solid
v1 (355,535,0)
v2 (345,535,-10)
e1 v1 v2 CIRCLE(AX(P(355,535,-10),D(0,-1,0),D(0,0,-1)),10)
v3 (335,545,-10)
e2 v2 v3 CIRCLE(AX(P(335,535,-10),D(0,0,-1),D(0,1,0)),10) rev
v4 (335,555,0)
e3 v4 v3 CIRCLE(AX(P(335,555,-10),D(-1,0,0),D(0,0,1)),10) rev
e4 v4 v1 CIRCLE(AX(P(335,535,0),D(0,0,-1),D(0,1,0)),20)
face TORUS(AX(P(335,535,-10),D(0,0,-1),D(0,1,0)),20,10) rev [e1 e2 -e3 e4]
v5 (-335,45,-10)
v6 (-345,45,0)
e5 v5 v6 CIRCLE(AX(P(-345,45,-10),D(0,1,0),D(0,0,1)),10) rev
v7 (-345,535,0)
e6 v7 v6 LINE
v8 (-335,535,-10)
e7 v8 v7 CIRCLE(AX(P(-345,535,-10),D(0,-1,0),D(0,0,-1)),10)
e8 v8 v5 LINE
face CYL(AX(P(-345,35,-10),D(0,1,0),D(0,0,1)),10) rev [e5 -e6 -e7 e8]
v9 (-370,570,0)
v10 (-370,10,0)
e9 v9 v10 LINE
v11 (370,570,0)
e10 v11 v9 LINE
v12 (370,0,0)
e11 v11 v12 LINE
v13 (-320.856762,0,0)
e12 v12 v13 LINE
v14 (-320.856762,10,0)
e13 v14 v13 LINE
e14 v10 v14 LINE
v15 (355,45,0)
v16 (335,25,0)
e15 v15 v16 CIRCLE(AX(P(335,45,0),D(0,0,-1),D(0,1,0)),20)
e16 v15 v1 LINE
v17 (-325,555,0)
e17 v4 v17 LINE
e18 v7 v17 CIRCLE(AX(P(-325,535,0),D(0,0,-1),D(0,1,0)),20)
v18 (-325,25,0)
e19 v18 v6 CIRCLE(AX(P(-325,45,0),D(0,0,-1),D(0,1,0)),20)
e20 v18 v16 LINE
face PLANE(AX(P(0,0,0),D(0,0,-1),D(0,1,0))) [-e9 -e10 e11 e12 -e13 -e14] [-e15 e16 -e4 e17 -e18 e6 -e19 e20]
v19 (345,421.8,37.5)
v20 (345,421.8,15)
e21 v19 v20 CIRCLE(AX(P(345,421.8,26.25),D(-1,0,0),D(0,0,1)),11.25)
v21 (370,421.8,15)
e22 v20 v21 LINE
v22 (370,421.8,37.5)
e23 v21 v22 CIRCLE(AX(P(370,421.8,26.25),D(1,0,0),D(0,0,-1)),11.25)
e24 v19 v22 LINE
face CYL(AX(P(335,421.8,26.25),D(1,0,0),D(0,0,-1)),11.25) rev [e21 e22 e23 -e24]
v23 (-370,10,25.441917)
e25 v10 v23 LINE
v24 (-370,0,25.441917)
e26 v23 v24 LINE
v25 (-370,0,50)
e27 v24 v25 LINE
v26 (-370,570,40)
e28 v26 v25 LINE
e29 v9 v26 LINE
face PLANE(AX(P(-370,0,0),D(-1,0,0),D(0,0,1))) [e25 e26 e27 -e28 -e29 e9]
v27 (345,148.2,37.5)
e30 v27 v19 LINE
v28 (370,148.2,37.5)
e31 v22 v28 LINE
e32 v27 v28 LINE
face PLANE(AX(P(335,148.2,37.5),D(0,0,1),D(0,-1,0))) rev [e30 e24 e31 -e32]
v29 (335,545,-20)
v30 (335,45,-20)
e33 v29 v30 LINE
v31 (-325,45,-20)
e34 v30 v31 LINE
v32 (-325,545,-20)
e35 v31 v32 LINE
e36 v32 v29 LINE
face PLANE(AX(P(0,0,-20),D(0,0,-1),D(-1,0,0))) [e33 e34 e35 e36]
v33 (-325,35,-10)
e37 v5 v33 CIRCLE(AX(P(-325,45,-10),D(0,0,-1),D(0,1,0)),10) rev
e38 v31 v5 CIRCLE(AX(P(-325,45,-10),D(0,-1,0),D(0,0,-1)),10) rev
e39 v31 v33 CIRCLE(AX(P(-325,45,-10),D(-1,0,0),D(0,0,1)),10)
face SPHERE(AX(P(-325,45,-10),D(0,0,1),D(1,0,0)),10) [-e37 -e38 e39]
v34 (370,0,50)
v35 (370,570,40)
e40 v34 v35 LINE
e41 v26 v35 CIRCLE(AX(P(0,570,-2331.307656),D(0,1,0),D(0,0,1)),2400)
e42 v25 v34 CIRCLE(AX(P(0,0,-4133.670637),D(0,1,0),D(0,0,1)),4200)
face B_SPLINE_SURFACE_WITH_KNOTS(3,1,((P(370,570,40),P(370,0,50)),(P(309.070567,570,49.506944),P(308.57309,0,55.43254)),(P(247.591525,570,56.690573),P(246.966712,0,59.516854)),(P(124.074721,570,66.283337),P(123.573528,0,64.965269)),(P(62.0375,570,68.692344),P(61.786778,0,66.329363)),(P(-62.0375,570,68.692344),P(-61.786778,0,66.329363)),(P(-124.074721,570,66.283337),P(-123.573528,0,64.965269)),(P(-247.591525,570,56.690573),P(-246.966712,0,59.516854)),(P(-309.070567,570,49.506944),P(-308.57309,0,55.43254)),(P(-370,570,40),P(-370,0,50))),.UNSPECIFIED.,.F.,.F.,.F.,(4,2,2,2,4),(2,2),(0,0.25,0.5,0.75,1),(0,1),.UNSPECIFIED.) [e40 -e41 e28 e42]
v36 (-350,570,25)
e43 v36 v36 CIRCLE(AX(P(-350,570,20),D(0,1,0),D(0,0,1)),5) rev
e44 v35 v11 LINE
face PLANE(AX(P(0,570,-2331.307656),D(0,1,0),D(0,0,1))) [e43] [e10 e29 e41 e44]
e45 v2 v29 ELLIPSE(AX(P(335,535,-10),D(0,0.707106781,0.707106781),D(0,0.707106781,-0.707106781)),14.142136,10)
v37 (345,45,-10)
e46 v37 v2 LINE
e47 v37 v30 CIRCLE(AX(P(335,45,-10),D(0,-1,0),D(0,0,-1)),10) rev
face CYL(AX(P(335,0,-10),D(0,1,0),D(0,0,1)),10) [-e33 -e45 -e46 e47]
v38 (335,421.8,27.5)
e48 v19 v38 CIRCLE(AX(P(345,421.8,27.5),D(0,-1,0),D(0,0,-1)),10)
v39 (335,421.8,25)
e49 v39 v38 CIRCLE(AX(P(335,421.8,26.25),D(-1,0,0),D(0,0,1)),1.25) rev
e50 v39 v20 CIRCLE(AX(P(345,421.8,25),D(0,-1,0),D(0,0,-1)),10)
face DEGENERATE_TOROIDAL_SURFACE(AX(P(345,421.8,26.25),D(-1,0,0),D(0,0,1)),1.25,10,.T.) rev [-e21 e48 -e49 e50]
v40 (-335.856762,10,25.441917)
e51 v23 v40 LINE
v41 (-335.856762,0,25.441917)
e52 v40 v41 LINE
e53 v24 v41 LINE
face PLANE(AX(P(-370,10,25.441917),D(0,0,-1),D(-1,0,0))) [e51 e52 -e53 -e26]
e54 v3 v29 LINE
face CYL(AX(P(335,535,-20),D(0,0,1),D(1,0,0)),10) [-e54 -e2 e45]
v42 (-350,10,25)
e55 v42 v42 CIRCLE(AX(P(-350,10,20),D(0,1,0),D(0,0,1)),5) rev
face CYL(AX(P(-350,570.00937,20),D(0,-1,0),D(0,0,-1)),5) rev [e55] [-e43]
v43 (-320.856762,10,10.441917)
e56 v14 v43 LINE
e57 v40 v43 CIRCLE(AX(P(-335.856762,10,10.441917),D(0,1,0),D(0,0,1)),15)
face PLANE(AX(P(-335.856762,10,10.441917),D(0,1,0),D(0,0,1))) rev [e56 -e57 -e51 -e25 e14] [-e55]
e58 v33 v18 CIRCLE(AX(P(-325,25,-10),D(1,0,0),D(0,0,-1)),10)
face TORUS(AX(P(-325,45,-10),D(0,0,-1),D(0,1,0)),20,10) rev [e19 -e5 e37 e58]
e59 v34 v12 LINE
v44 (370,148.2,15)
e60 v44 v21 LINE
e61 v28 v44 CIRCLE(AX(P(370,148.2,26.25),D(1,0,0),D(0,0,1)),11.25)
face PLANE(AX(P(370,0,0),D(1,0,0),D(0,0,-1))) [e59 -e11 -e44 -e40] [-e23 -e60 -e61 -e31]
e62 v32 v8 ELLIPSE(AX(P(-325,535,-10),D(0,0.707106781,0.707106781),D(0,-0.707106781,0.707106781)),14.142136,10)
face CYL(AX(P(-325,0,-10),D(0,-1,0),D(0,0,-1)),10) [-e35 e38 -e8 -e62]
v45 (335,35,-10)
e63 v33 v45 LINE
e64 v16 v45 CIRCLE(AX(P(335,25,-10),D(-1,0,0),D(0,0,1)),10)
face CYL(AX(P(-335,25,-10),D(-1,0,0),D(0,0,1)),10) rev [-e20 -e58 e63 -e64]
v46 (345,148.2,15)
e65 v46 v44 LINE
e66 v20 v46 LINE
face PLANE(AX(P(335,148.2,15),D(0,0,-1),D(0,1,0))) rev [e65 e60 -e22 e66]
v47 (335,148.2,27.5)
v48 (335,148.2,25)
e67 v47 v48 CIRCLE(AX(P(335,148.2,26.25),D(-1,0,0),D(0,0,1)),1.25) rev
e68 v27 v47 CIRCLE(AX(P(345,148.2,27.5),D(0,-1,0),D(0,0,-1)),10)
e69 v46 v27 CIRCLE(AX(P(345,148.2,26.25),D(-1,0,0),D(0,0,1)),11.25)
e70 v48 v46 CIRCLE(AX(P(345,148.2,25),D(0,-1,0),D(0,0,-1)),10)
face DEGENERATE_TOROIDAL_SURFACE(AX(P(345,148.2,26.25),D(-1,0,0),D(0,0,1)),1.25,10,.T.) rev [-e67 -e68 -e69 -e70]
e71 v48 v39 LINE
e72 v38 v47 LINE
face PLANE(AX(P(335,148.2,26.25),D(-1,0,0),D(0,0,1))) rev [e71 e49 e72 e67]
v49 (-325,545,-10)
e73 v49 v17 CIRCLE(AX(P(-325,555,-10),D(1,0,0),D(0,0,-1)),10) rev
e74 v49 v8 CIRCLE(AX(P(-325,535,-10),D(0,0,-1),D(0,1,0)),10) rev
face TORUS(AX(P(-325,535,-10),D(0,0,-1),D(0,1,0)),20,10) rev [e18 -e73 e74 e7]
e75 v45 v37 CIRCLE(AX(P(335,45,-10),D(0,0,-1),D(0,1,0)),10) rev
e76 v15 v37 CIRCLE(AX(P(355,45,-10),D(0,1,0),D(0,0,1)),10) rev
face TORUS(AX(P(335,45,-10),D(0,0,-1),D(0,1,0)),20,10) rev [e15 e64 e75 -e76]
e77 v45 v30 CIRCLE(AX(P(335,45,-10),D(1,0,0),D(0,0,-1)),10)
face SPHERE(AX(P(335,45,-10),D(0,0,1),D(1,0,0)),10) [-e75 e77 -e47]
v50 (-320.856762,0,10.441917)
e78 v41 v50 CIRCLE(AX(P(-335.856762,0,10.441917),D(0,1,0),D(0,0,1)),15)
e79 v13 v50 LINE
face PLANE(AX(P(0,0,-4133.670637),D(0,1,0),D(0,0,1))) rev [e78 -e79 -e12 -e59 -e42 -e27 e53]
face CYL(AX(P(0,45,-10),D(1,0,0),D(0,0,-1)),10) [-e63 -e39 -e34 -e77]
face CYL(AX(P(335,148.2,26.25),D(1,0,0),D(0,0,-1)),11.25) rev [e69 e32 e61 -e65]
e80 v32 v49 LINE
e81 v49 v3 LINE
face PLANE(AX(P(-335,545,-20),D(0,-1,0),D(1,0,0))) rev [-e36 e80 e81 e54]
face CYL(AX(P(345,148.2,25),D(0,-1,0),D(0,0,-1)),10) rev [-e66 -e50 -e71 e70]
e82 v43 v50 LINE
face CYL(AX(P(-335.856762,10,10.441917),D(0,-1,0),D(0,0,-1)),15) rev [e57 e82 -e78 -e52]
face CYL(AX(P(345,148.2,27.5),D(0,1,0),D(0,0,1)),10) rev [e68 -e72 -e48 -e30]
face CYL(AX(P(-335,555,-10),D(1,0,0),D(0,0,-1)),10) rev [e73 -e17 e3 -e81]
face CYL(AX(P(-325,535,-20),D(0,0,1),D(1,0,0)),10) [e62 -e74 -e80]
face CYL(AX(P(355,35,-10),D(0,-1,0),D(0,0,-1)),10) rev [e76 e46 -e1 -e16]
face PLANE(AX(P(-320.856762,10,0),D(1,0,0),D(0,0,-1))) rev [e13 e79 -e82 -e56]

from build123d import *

# Parameters (mm, degrees)
CORTE_EXTRUS_O3_REACH    = 685.022
ESBO_O5_R                = 5
CORTE_EXTRUS_O4_DEPTH    = 10
ESBO_O8_W                = 680
ESBO_O8_H                = 510
RESSALTO_EXTRUS_O1_DEPTH = 20
FILETE1_R                = 10
CORTE_EXTRUS_O5_DEPTH    = 35
FILETE17_R               = 10


with BuildPart() as part:
    # Esboço2 for Loft1 → Loft1 section 0
    with BuildSketch(Plane(origin=(0, 570, 0), x_dir=(1, 0, 0), z_dir=(0, 1, 0))):
        with BuildLine():
            Line((-370, 0), (370, 0))
            Line((370, 0), (370, -40))
            # circular arc as an exact rational Bezier (weights 1, cos(half-angle), 1)
            Bezier((370, -40), (0, -97.731859317), (-370, -40), weights=[1, 0.988044857, 1])
            Line((-370, -40), (-370, 0))
        make_face()
    # Esboço1 for Loft1 → Loft1 section 1
    with BuildSketch(Plane(origin=(0, 0, 0), x_dir=(1, 0, 0), z_dir=(0, 1, 0))):
        with BuildLine():
            Line((-370, 0), (370, 0))
            Line((370, 0), (370, -50))
            Bezier((370, -50), (0, -82.722461177), (-370, -50), weights=[1, 0.996112056, 1])
            Line((-370, -50), (-370, 0))
        make_face()
    loft()

    # Esboço5 → Corte-extrusão3 (cut, up to next)
    with BuildSketch(Plane.XZ, mode=Mode.PRIVATE) as corte_extrus_o3_sk1:
        with Locations(Location((-350, 20, 0), (0, 0, 270))):
            Circle(ESBO_O5_R)
    corte_extrus_o3_tool1 = extrude(corte_extrus_o3_sk1.sketch, amount=-CORTE_EXTRUS_O3_REACH, mode=Mode.PRIVATE) & part.part
    add(corte_extrus_o3_tool1.solids().sort_by_distance((-350, 0, 20))[0], mode=Mode.SUBTRACT)

    # Esboço6 → Corte-extrusão4 (cut)
    with BuildSketch(Plane.XZ):
        with BuildLine():
            Line((-370, 0), (-320.856761827, 0))
            Line((-320.856761827, 0), (-320.856761827, 10.441916975))
            ThreePointArc((-320.856761827, 10.441916975), (-325.250160109, 21.048518693), (-335.856761827, 25.441916975))
            Line((-335.856761827, 25.441916975), (-370, 25.441916975))
            Line((-370, 25.441916975), (-370, 0))
        make_face()
    extrude(amount=-CORTE_EXTRUS_O4_DEPTH, mode=Mode.SUBTRACT)

    # Esboço8 → Ressalto-extrusão1 (add)
    with BuildSketch(Plane(origin=(0, 0, 0), x_dir=(-1, 0, 0), z_dir=(0, 0, -1))):
        with Locations((-5, 290)):
            Rectangle(ESBO_O8_W, ESBO_O8_H)
    extrude(amount=RESSALTO_EXTRUS_O1_DEPTH)

    # Filete1
    filete1_edges = [part.edges().sort_by_distance(p)[0] for p in [
        (-335, 290, 0),
        (-335, 35, -10),
        (5, 545, 0),
        (-335, 545, -10),
        (345, 290, 0),
        (345, 545, -10),
        (5, 35, 0),
        (345, 35, -10),
        (-335, 290, -20),
        (345, 290, -20),
        (5, 35, -20),
    ]]
    fillet(filete1_edges, radius=FILETE1_R - 0.0001)  # a hair under: the kernel refuses the full size

    # Esboço11 → Corte-extrusão5 (cut)
    with BuildSketch(Plane(origin=(370, 0, 0), x_dir=(0, 0, -1), z_dir=(1, 0, 0))):
        with BuildLine():
            Line((-37.5, 148.2), (-37.5, 421.8))
            ThreePointArc((-37.5, 421.8), (-26.25, 433.05), (-15, 421.8))
            Line((-15, 421.8), (-15, 148.2))
            ThreePointArc((-15, 148.2), (-26.25, 136.95), (-37.5, 148.2))
        make_face()
    extrude(amount=-CORTE_EXTRUS_O5_DEPTH, mode=Mode.SUBTRACT)

    # Filete17
    filete17_edges = [part.edges().sort_by_distance(p)[0] for p in [
        (335, 136.95, 26.25),
        (335, 285, 37.5),
        (335, 433.05, 26.25),
        (335, 285, 15),
    ]]
    fillet(filete17_edges, radius=FILETE17_R)


solid = part.part
